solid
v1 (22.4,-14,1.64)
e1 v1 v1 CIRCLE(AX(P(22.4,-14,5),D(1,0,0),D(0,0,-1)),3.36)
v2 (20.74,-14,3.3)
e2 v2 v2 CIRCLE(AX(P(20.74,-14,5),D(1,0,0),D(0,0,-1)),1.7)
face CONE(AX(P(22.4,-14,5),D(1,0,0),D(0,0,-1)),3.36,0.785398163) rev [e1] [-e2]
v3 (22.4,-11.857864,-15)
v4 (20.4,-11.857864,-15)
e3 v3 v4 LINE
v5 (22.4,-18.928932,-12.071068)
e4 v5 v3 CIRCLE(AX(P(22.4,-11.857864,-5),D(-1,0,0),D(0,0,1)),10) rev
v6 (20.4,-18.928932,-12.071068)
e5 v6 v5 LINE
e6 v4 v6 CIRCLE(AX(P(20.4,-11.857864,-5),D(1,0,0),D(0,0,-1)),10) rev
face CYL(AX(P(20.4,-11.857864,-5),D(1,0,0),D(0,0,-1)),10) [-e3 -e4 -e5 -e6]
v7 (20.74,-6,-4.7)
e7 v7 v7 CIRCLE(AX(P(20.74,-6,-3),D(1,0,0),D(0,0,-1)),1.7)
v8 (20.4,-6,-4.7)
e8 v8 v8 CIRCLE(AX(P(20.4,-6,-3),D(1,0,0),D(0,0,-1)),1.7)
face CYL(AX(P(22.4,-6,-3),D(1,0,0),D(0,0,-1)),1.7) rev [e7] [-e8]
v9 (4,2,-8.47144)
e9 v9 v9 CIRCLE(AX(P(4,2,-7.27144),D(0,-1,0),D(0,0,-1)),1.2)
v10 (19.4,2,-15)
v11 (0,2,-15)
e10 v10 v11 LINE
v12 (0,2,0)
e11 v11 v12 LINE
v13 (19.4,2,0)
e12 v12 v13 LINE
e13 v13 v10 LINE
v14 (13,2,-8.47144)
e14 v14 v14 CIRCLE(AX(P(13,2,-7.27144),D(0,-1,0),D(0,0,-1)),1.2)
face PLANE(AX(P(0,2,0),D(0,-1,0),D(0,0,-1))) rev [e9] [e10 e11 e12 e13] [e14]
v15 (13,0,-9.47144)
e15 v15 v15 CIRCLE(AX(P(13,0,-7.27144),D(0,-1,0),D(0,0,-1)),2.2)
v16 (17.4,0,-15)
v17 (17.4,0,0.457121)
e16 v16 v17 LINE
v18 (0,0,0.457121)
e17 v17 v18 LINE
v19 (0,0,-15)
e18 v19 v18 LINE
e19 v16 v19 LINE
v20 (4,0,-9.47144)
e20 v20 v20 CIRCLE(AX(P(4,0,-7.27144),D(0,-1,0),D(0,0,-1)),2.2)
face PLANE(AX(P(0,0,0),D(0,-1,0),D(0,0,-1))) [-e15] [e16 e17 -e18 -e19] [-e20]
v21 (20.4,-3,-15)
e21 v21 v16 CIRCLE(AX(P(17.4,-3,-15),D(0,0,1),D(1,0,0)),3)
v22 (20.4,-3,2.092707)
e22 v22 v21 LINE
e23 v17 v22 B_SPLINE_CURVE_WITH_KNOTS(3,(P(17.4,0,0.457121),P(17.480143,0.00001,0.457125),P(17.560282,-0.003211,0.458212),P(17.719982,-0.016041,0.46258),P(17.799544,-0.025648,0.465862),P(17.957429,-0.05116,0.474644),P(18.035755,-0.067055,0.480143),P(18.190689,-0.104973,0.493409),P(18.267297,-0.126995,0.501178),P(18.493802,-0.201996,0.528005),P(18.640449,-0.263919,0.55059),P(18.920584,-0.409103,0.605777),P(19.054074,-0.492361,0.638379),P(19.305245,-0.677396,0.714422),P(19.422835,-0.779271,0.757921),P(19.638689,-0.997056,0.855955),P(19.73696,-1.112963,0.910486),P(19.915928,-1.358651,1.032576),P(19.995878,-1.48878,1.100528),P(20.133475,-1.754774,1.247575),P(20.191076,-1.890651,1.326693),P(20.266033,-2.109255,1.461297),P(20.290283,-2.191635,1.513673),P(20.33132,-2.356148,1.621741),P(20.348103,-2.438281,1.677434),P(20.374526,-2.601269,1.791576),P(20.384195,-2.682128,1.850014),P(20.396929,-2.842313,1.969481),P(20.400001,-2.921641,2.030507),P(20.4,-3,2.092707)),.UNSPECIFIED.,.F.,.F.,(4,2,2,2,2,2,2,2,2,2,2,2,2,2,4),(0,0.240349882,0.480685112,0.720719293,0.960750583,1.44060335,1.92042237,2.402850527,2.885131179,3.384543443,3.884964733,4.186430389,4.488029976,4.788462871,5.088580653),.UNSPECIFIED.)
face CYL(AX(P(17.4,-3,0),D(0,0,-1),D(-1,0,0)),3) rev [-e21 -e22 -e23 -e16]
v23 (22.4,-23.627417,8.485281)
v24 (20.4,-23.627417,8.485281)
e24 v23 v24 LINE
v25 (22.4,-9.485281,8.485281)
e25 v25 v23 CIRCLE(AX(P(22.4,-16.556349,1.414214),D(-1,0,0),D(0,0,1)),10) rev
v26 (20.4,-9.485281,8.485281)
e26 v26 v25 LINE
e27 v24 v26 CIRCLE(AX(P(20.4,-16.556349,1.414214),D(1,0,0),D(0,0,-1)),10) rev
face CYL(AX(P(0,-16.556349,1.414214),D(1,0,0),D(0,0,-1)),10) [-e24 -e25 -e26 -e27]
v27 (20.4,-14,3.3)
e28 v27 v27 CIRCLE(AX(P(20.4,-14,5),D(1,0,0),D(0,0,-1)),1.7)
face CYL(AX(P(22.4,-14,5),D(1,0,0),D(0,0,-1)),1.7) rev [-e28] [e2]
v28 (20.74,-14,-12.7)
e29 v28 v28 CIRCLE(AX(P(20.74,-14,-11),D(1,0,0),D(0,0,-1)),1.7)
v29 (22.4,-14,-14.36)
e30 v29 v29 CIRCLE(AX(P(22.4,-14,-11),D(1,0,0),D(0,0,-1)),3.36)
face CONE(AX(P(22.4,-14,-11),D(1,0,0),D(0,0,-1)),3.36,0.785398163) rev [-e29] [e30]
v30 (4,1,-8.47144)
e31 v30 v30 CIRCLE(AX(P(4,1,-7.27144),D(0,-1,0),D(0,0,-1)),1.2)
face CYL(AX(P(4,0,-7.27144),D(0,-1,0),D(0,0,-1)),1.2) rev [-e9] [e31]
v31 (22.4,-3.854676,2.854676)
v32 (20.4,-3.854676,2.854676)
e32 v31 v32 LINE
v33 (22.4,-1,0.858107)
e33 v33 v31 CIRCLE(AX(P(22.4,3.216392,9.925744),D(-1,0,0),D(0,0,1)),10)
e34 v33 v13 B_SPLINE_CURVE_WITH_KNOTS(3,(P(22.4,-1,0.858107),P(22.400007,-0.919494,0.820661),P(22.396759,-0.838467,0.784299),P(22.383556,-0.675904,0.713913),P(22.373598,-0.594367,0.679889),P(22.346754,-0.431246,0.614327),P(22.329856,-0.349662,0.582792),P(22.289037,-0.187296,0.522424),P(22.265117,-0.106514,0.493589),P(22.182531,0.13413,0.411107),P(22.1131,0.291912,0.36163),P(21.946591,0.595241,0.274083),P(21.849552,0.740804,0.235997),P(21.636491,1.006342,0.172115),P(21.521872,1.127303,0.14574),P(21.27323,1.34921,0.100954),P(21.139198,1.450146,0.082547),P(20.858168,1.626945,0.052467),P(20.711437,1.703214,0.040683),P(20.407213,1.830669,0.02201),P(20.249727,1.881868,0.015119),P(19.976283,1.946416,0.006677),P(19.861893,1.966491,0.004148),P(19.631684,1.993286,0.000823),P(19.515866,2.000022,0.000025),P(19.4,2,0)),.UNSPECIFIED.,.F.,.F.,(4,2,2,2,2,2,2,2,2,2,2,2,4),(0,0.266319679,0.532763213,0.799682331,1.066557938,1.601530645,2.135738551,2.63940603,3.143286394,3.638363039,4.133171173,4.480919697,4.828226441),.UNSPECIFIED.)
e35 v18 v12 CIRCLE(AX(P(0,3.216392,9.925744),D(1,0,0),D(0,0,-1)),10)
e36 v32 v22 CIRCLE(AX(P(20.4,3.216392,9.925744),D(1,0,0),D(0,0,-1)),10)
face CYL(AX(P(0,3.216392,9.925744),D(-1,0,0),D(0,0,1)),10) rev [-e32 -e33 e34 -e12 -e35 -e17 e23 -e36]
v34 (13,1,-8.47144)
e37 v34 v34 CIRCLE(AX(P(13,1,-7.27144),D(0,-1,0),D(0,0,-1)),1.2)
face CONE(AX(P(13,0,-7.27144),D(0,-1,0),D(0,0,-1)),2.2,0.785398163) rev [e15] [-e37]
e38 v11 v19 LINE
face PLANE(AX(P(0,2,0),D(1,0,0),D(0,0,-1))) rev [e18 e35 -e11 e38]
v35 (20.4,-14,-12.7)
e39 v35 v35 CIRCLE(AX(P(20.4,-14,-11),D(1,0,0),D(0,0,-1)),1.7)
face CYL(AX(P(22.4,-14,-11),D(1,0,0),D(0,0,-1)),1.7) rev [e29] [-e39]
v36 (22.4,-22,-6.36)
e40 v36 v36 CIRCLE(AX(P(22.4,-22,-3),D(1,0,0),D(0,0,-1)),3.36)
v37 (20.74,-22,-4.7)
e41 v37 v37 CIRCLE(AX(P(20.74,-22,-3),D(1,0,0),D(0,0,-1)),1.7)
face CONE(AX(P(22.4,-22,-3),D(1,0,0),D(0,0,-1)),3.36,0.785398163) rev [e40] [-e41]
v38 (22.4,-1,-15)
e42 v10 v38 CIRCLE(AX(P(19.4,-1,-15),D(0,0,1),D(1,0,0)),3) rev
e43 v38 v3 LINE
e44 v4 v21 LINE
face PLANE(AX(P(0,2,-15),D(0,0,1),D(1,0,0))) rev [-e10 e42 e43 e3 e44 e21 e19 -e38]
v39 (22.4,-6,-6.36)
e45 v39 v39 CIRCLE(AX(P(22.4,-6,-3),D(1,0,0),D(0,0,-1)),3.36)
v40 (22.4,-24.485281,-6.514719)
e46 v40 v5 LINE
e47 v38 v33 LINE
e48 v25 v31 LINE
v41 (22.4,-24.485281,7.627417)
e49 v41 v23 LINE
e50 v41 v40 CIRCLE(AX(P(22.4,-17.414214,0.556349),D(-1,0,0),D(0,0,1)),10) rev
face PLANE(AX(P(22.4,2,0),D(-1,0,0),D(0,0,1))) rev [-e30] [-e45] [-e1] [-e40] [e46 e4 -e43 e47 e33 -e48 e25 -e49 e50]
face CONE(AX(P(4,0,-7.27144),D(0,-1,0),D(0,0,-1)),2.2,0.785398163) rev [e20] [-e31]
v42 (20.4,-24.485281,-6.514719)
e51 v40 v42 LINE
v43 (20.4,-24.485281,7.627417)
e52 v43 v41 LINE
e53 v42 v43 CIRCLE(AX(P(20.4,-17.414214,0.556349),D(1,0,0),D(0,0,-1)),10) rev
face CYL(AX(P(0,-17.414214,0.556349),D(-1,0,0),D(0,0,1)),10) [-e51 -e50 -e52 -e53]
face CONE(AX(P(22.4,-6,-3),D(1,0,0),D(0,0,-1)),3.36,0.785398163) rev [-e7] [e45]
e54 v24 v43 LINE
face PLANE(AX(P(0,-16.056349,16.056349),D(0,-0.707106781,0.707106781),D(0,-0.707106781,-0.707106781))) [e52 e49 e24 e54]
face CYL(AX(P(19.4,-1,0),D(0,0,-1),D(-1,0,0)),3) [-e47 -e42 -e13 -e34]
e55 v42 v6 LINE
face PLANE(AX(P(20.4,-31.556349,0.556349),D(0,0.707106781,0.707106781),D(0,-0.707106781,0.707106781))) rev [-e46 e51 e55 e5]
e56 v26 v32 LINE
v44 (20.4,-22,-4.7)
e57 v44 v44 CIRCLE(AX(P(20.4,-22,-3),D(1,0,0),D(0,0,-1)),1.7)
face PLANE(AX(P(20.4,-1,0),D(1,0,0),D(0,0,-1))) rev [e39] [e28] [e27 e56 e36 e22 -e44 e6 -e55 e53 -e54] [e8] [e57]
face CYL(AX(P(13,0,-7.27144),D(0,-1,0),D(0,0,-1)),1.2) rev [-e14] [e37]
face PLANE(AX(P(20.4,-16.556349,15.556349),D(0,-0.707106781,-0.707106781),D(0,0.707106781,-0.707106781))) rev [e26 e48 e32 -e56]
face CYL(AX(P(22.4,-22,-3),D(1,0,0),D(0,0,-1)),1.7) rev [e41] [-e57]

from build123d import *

# Parameters (mm, degrees)
ESBO_O1_W                                    = 22.4
ESBO_O1_H                                    = 15
RESSALTO_EXTRUS_O1_DEPTH                     = 2
ESBO_O9_W                                    = 2
ESBO_O9_H                                    = 15
RESSALTO_EXTRUS_O2_DEPTH                     = 1
INCLINA_O2_ANGLE                             = 45
ESBO_O11_W                                   = 2
ESBO_O11_H                                   = 21.213203436
RESSALTO_EXTRUS_O4_DEPTH                     = 22
FILETE1_START                                = 20.4
FILETE1_DEPTH                                = 2
FILETE1_2_DEPTH                              = 22.4
FILETE1_3_DEPTH                              = 2
ESCAREADO_PARA_SFHCS_M31_D                   = 3.4
ESCAREADO_PARA_SFHCS_M31_DEPTH               = 7.5
ESCAREADO_PARA_SFHCS_M31_CSINK_D             = 6.72
ESCAREADO_PARA_SFHCS_M31_CSINK_ANGLE         = 90
ESCAREADO_PARA_SFHCS_M31_TIP                 = 1.021463052
FILETE2_R                                    = 3
ESCAREADO_PARA_PARAFUSO_COM_CABE_A_E_2_COUNT = 2
ESCAREADO_PARA_PARAFUSO_COM_CABE_A_E_2_PITCH = 9


with BuildPart() as part:
    # Esboço1 → Ressalto-extrusão1 (new body)
    with BuildSketch(Plane(origin=(0, 0, 0), x_dir=(1, 0, 0), z_dir=(0, 1, 0))):
        with Locations((11.2, 7.5)):
            Rectangle(ESBO_O1_W, ESBO_O1_H)
    extrude(amount=RESSALTO_EXTRUS_O1_DEPTH)

    # Esboço9 → Ressalto-extrusão2 (add)
    with BuildSketch(Plane.XZ):
        with Locations((21.4, -7.5)):
            Rectangle(ESBO_O9_W, ESBO_O9_H)
    extrude(amount=RESSALTO_EXTRUS_O2_DEPTH)

    # Inclinação2
    inclina_o2_faces = [part.faces().sort_by_distance(p)[0] for p in [
        (21.4, -1, -7.5),
    ]]
    draft(inclina_o2_faces, Plane(origin=(0, 2, 0), x_dir=(1, 0, 0), z_dir=(0, 0, 1)), INCLINA_O2_ANGLE)

    # Esboço11 → Ressalto-extrusão4 (add)
    with BuildSketch(Plane(origin=(0, -0.5, 0.5), x_dir=(1, 0, 0), z_dir=(0, -0.7071067811865462, 0.7071067811865488))):
        with Locations((21.4, -11.313708499)):
            Rectangle(ESBO_O11_W, ESBO_O11_H)
    extrude(amount=RESSALTO_EXTRUS_O4_DEPTH)

    # Filete1: read off the stored shape, not the designer's step
    # Filete1 outline → Filete1 (cut)
    with BuildSketch(Plane.YZ.offset(FILETE1_START)):
        with BuildLine():
            ThreePointArc((-23.627416998, 8.485281374), (-16.556349186, 11.414213562), (-9.485281374, 8.485281374))
            Line((-9.485281374, 8.485281374), (-16.556349186, 15.556349186))
            Line((-16.556349186, 15.556349186), (-23.627416998, 8.485281374))
        make_face()
        with BuildLine():
            Line((-16, -15), (-11.857864376, -15))
            ThreePointArc((-11.857864376, -15), (-15.6846987, -14.238795325), (-18.928932188, -12.071067812))
            Line((-18.928932188, -12.071067812), (-16, -15))
        make_face()
        with BuildLine():
            ThreePointArc((-24.485281374, -6.514718626), (-27.414213562, 0.556349186), (-24.485281374, 7.627416998))
            Line((-24.485281374, 7.627416998), (-31.556349186, 0.556349186))
            Line((-31.556349186, 0.556349186), (-24.485281374, -6.514718626))
        make_face()
    extrude(amount=FILETE1_DEPTH, mode=Mode.SUBTRACT)

    # Filete1 2 outline → Filete1 2 (add)
    with BuildSketch(Plane.YZ):
        with BuildLine():
            Line((0, 0), (2, 0))
            ThreePointArc((2, 0), (0.988246282, 0.177135355), (0, 0.457120724))
            Line((0, 0.457120724), (0, 0))
        make_face()
    extrude(amount=FILETE1_2_DEPTH)

    # Filete1 3 outline → Filete1 3 (add)
    with BuildSketch(Plane.YZ.offset(FILETE1_START)):
        with BuildLine():
            Line((0, 0), (0, 0.457120724))
            ThreePointArc((0, 0.457120724), (-2.065182242, 1.434278965), (-3.854676043, 2.854676043))
            Line((-3.854676043, 2.854676043), (-1, 0))
            Line((-1, 0), (0, 0))
        make_face()
    extrude(amount=FILETE1_3_DEPTH)

    # Escareado para SFHCS M31
    with Locations(Plane(origin=(22.4, 0, 0), x_dir=(0, 0, -1), z_dir=(1, 0, 0))):
        with Locations((3, -6), (11, -14), (3, -22), (-5, -14)):
            CounterSinkHole(ESCAREADO_PARA_SFHCS_M31_D / 2, ESCAREADO_PARA_SFHCS_M31_CSINK_D / 2, depth=ESCAREADO_PARA_SFHCS_M31_DEPTH, counter_sink_angle=ESCAREADO_PARA_SFHCS_M31_CSINK_ANGLE)
            with Locations((0, 0, -(ESCAREADO_PARA_SFHCS_M31_DEPTH + ESCAREADO_PARA_SFHCS_M31_TIP / 2))):  # 118° drill point
                Cone(0, ESCAREADO_PARA_SFHCS_M31_D / 2, ESCAREADO_PARA_SFHCS_M31_TIP, mode=Mode.SUBTRACT)

    # Filete2
    # the kernel refuses this fillet: 3 mm, written as the material it adds along each edge
    with BuildSketch(Plane(origin=(20.4, 0, -15), x_dir=(-1, 0, 0), z_dir=(0, 0, 1))) as filete2_piece_1_section:
        with BuildLine():
            CenterArc((FILETE2_R, FILETE2_R), FILETE2_R, 180, 90)
            Line((0, FILETE2_R), (0, 0))
            Line((0, 0), (FILETE2_R, 0))
        make_face()
    filete2_piece_1 = extrude(amount=22.957120724, mode=Mode.PRIVATE)
    filete2_piece_1 = filete2_piece_1 - Plane(origin=(20.4, 3.216391795, 9.925743967), x_dir=(0, -0.12163917811992071, -0.9925743852962912), z_dir=(-1, 0, 0)) * Cylinder(10.000000115, 58, mode=Mode.PRIVATE)
    add(filete2_piece_1)
    # the kernel refuses this fillet: 3 mm, written as the material it takes off along each edge
    with BuildSketch(Plane(origin=(22.4, 2, 7.5), x_dir=(-1, 0, 0), z_dir=(0, 0, -1))) as filete2_2_piece_1:
        with BuildLine():
            CenterArc((FILETE2_R, -FILETE2_R), FILETE2_R, 90, 90)
            Line((0, -FILETE2_R), (0, 0))
            Line((0, 0), (FILETE2_R, 0))
        make_face()
    extrude(amount=30, mode=Mode.SUBTRACT)

    # Esboço16 → Escareado para parafuso com cabeça escareada elevada de M21 (revolve, cut)
    with BuildSketch(Plane(origin=(4, 0, -7.271439638), x_dir=(0, 0, -1), z_dir=(1, 0, 0))):
        Polygon((0, 0), (0, 2), (1.2, 2), (1.2, 1), (2.2, 0), align=None)
    escareado_para_parafuso_com_cabe_a_escar = revolve(axis=Axis((4, -6.35, -7.271439638), (0, 1, 0)), mode=Mode.SUBTRACT)

    # Escareado para parafuso com cabe_a e 2: Escareado para parafuso com cabeça escareada elevada de M21 ×2
    with Locations(*[(i * ESCAREADO_PARA_PARAFUSO_COM_CABE_A_E_2_PITCH, 0, 0) for i in range(1, ESCAREADO_PARA_PARAFUSO_COM_CABE_A_E_2_COUNT)]):
        add(escareado_para_parafuso_com_cabe_a_escar, mode=Mode.SUBTRACT)


solid = part.part
